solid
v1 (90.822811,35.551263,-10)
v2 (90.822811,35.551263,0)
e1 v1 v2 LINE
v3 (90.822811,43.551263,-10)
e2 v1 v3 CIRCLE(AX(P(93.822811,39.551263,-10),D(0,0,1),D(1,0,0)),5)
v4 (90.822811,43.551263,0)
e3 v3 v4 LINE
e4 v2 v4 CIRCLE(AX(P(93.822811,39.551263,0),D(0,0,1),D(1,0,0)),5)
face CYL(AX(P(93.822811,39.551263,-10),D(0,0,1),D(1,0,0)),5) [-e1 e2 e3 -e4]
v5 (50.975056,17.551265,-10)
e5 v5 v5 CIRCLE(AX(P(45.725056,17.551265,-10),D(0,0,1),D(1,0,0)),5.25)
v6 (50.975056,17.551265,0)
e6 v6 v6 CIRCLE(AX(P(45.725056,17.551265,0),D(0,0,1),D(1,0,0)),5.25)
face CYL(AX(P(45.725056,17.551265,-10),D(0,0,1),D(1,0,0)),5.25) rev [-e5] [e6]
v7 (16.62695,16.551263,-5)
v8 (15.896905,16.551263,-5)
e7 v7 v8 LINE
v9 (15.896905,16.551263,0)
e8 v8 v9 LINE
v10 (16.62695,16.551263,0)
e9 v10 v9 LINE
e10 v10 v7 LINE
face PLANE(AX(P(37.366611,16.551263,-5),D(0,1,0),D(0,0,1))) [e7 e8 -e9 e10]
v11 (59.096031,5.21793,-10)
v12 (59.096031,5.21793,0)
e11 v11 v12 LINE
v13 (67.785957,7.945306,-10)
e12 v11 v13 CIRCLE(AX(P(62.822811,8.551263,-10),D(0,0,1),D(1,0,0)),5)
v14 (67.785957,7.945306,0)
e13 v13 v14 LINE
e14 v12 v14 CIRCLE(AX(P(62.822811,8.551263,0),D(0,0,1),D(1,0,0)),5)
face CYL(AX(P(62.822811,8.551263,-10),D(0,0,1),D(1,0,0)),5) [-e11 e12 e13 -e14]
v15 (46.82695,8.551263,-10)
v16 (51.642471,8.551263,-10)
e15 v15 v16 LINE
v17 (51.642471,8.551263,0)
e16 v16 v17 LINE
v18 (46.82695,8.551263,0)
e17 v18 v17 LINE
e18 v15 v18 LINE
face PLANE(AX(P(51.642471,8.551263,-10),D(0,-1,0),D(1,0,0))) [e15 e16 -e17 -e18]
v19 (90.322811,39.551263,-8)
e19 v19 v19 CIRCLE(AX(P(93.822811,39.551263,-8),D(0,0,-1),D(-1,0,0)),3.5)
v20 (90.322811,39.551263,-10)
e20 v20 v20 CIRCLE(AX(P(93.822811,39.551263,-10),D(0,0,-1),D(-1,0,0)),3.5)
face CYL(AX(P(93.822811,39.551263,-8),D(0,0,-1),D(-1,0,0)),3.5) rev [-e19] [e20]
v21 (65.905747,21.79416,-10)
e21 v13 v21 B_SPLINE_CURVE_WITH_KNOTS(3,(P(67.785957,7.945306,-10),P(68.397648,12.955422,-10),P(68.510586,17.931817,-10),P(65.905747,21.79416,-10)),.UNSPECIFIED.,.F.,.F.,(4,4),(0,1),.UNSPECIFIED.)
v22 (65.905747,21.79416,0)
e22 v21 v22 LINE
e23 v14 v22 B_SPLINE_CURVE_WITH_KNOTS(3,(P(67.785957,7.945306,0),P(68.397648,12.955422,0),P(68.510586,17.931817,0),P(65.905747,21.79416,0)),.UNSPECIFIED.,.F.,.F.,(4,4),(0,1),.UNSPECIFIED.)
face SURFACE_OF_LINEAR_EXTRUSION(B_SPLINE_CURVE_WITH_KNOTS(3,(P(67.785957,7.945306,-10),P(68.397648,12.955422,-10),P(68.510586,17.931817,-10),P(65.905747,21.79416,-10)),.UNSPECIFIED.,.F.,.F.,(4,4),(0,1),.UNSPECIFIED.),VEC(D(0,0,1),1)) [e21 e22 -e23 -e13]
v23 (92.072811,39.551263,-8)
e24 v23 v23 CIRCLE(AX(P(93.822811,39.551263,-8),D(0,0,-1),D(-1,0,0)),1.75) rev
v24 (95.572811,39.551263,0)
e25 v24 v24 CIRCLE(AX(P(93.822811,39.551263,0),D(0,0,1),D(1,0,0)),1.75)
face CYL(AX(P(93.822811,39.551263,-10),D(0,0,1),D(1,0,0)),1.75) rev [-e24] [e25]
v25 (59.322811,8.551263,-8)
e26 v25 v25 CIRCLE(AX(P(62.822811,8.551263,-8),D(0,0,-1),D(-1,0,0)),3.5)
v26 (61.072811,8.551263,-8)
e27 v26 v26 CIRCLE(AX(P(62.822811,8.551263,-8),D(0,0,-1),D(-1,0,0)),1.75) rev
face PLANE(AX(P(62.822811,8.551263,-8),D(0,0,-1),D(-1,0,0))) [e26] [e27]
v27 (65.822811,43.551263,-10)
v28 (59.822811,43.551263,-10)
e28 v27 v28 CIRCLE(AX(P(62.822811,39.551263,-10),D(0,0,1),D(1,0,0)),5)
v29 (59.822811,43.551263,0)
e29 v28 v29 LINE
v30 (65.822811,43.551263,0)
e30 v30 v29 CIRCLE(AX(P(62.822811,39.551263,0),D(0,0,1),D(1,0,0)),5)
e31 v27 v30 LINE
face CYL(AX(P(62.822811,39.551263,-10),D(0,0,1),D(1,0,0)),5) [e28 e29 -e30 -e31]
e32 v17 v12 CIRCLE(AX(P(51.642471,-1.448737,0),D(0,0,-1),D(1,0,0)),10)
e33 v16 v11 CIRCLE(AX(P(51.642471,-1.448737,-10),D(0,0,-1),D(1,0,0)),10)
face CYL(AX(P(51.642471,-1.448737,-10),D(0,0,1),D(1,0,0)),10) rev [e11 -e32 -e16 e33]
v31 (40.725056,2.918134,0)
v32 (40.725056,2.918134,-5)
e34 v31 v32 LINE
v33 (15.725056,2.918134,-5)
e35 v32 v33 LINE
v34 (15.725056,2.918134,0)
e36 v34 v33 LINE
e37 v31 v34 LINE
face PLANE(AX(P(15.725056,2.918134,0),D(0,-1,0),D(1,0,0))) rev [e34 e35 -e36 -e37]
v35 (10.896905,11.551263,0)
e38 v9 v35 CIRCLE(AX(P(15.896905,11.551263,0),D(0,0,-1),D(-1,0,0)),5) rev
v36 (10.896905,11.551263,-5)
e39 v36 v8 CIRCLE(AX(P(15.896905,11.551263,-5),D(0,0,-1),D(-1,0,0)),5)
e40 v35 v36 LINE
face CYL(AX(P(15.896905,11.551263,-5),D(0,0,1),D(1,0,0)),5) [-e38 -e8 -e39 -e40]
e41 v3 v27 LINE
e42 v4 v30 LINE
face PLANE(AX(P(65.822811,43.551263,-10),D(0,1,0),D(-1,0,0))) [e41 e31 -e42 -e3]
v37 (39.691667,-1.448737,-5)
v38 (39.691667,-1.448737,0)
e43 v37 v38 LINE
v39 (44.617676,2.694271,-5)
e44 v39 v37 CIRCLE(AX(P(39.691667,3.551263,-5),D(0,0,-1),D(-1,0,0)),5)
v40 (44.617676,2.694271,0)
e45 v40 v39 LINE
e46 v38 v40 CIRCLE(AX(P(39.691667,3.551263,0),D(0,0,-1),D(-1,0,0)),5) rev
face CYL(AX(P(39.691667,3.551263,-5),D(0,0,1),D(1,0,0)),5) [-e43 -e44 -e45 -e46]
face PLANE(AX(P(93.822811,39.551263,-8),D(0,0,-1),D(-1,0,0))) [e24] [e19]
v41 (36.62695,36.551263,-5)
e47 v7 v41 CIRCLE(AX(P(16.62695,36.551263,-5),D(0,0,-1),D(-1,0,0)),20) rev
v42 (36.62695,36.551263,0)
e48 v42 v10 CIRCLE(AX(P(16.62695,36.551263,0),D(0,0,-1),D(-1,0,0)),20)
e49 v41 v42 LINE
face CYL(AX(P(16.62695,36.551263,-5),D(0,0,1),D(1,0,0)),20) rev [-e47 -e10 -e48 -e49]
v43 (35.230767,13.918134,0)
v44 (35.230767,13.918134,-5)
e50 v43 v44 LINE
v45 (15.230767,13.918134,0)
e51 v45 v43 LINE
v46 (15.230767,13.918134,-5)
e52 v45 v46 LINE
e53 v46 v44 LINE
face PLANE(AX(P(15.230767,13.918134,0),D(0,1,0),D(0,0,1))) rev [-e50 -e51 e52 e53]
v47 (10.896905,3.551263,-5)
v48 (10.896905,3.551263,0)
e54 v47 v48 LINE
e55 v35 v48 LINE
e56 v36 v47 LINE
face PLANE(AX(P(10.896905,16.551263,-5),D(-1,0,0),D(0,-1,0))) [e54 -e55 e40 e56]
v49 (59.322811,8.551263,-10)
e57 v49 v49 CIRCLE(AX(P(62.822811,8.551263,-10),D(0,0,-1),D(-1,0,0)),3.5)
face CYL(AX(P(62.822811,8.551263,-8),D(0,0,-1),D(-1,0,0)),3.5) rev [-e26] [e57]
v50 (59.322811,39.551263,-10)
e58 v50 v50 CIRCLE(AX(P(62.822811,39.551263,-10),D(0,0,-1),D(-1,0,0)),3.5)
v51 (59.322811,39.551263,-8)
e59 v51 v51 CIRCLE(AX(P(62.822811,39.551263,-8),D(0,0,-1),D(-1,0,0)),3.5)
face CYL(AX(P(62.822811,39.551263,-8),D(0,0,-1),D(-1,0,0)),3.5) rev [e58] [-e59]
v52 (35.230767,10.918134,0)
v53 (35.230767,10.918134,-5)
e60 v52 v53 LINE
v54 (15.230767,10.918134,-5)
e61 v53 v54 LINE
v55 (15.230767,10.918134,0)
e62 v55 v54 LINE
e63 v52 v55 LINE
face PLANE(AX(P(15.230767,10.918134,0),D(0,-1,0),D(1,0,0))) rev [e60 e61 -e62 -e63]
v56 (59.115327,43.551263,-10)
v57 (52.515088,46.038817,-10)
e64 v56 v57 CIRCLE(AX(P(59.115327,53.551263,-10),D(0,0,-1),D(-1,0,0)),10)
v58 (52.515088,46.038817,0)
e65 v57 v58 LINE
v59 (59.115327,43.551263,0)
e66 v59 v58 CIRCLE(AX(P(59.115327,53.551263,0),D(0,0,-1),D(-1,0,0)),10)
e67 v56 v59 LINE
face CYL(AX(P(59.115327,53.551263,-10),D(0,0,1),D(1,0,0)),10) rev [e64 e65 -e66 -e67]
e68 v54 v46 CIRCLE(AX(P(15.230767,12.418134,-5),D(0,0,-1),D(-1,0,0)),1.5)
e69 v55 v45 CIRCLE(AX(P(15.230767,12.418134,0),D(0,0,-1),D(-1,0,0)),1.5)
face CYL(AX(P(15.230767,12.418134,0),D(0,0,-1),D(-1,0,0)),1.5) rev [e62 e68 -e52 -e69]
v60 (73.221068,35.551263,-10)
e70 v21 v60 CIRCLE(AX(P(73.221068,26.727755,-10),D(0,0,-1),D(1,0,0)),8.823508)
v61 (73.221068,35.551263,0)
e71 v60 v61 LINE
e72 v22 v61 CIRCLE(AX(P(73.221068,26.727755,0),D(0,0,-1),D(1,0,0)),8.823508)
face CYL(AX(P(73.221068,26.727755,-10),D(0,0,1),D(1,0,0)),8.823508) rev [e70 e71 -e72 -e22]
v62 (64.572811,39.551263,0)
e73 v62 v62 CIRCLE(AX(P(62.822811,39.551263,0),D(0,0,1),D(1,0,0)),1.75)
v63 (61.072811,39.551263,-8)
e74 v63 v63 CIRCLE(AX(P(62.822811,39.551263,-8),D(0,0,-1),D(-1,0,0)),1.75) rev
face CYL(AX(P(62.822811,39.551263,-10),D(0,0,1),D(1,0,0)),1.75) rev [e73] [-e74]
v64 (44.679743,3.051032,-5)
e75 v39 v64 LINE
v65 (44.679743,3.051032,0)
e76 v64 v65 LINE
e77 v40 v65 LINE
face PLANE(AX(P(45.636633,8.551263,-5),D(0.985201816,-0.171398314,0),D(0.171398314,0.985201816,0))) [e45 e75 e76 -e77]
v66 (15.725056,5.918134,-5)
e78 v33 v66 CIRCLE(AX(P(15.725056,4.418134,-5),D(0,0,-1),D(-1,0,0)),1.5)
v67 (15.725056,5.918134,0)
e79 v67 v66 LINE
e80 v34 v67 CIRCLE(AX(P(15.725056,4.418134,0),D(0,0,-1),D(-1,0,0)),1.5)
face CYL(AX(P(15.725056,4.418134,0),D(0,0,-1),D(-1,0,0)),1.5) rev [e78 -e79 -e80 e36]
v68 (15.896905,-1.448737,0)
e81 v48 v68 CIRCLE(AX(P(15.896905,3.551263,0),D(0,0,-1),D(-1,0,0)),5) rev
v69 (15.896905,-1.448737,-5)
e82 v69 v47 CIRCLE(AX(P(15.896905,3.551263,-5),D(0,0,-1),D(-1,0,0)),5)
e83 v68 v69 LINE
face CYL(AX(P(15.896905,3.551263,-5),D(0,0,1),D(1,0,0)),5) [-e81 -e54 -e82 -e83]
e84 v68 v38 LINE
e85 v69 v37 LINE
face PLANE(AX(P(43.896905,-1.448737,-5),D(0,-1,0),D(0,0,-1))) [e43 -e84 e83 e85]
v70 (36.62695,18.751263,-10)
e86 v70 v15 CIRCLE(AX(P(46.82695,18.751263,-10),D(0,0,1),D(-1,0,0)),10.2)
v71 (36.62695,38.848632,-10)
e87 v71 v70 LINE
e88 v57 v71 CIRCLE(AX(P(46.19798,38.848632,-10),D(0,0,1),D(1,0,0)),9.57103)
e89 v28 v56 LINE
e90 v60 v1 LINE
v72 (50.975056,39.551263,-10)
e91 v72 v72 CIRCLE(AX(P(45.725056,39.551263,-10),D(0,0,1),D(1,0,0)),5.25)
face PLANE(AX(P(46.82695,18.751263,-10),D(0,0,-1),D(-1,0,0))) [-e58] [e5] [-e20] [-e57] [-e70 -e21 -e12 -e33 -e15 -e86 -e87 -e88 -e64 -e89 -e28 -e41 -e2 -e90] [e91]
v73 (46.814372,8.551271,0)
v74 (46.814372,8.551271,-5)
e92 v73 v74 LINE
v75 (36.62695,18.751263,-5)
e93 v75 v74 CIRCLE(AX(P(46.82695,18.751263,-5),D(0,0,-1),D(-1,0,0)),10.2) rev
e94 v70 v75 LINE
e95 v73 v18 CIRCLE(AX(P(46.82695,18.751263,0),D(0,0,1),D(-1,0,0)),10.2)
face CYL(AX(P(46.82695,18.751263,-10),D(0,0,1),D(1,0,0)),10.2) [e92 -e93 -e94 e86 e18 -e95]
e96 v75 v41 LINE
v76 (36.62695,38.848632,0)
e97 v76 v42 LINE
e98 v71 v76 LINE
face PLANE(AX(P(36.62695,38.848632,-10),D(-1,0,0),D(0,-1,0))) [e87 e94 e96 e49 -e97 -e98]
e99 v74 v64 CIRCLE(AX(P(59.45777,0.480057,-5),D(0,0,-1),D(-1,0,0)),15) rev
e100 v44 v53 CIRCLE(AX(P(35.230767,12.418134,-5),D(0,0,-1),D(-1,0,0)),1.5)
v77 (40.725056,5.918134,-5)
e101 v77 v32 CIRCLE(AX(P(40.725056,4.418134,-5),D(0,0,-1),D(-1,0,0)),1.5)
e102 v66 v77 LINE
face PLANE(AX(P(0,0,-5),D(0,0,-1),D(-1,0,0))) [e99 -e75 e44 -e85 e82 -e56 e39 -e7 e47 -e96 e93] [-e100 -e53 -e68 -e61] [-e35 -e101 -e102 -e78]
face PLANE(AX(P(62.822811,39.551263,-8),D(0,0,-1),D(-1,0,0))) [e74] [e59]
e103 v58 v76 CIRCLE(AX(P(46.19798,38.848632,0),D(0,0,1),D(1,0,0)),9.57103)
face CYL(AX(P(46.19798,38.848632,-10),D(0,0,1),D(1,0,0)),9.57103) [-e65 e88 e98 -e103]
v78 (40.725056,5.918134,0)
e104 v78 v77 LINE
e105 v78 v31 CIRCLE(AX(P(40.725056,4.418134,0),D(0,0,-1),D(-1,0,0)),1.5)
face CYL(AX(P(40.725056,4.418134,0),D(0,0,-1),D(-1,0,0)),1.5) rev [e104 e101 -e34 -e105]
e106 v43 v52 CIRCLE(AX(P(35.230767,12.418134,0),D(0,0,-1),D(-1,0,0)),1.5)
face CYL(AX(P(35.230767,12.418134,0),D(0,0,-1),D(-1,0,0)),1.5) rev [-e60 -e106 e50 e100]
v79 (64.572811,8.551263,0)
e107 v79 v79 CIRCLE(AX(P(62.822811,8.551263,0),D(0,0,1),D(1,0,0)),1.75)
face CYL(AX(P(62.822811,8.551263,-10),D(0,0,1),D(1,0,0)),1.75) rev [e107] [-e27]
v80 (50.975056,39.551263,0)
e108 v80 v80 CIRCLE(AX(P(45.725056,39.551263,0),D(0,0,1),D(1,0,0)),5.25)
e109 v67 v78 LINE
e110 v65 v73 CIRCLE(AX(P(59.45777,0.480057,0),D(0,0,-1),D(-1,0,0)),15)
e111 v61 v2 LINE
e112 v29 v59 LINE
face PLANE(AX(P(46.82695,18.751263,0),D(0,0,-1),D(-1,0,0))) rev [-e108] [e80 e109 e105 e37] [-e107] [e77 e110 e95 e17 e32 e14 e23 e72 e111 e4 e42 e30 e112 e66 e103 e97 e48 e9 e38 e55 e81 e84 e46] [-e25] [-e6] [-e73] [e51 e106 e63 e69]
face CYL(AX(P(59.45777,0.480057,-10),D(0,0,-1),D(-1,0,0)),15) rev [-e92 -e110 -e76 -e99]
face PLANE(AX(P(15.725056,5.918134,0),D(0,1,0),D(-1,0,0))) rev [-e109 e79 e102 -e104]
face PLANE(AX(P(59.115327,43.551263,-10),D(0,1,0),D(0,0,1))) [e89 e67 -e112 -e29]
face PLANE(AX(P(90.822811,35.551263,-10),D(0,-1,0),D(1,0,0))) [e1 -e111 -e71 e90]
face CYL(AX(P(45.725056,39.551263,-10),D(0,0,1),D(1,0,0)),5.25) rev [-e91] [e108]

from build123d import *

# Parameters (mm, degrees)
SKETCH1_R           = 1.75
SKETCH1_R_2         = 5.25
BOSS_EXTRUDE1_DEPTH = 10
EXTRUDE1_DEPTH      = 5
FILLET2_R           = 20
FILLET3_R           = 5
FILLET5_R           = 5
EXTRUDE2_DEPTH      = 5
FILLET7_R           = 475
FILLET8_R           = 15
FILLET9_R           = 5
SKETCH4_R           = 3.5
EXTRUDE3_DEPTH      = 2


with BuildPart() as part:
    # Sketch1 → Boss-Extrude1 (new body)
    with BuildSketch(Plane.XY):
        with BuildLine():
            Line((59.115327383, 43.551262968), (59.822811009, 43.551262968))
            ThreePointArc((59.822811009, 43.551262968), (62.822811009, 44.551262968), (65.822811009, 43.551262968))
            Line((65.822811009, 43.551262968), (90.822811009, 43.551262968))
            ThreePointArc((90.822811009, 43.551262968), (98.822811009, 39.551262968), (90.822811009, 35.551262968))
            Line((90.822811009, 35.551262968), (73.221068218, 35.551262968))
            ThreePointArc((73.221068218, 35.551262968), (65.430500205, 30.870379763), (65.905746743, 21.794160382))
            add(Edge.make_bspline(
                [(65.905746743, 21.794160382), (68.510586107, 17.931817085), (68.397648351, 12.955422289), (67.785956814, 7.945306105)],
                knots=[0, 0, 0, 0, 1, 1, 1, 1], degree=3))
            ThreePointArc((67.785956814, 7.945306105), (67.117243875, 5.990433735), (65.715264602, 4.47281814))
            ThreePointArc((65.715264602, 4.47281814), (62.263505272, 3.582643734), (59.096031047, 5.217929635))
            ThreePointArc((59.096031047, 5.217929635), (55.724954026, 7.67997226), (51.642471122, 8.551262968))
            Line((51.642471122, 8.551262968), (46.826949913, 8.551262968))
            ThreePointArc((46.826949913, 8.551262968), (39.614460745, 11.5387738), (36.626949913, 18.751262968))
            Line((36.626949913, 18.751262968), (36.626949913, 38.848632096))
            ThreePointArc((36.626949913, 38.848632096), (42.251881835, 47.568318218), (52.515088487, 46.03881686))
            ThreePointArc((52.515088487, 46.03881686), (55.588605185, 44.19379373), (59.115327383, 43.551262968))
        make_face()
        with Locations((93.822811009, 39.551262968)):
            Circle(SKETCH1_R, mode=Mode.SUBTRACT)
        with Locations((62.822811009, 39.551262968)):
            Circle(SKETCH1_R, mode=Mode.SUBTRACT)
        with Locations((62.822811009, 8.551262968)):
            Circle(SKETCH1_R, mode=Mode.SUBTRACT)
        with Locations((45.725055781, 39.551262968)):
            Circle(SKETCH1_R_2, mode=Mode.SUBTRACT)
        with Locations((45.725055781, 17.551264875)):
            Circle(SKETCH1_R_2, mode=Mode.SUBTRACT)
    extrude(amount=-BOSS_EXTRUDE1_DEPTH)

    # Sketch2 → Extrude1 (add)
    with BuildSketch(Plane.XY):
        Polygon((45.636633265, 8.551262968), (43.896905309, -1.448737032), (10.896905309, -1.448737032), (10.896905309, 16.551262968), (37.366610934, 16.551262968), (39.363957543, 12.249932276), (45.636633265, 10.857586925), align=None)
    extrude(amount=-EXTRUDE1_DEPTH)

    # Fillet2
    # the kernel refuses this fillet: 20 mm, written as the material it adds along each edge
    with BuildSketch(Plane(origin=(36.867030235, 16.551262968, -5), x_dir=(-0.0120031513061412, 0.9999279595844501, 0), z_dir=(0, 0, 1))) as fillet2_piece_1:
        with BuildLine():
            CenterArc((20.241503938, 19.998559192), FILLET2_R, 179.312253574, 90)
            Line((0.242944747, 20.238622218), (-1.756911173, 20.26262852))
            Line((-1.756911173, 20.26262852), (-1.999855919, 0.024006303))
            Line((-1.999855919, 0.024006303), (0.407900213, -1.957962568))
            ThreePointArc((0.407900213, -1.957962568), (2.178716929, -1.786199826), (19.97743461, -1.999855919))
            Line((19.97743461, -1.999855919), (20.001440912, 0))
        make_face()
    extrude(amount=5)

    # Fillet3
    fillet3_edges = [part.edges().sort_by_distance(p)[0] for p in [
        (10.896905309, 16.551262968, -2.5),
    ]]
    fillet(fillet3_edges, radius=FILLET3_R)

    # Fillet5
    fillet5_edges = [part.edges().sort_by_distance(p)[0] for p in [
        (10.896905309, -1.448737032, -2.5),
    ]]
    fillet(fillet5_edges, radius=FILLET5_R)

    # Sketch3 → Extrude2 (cut)
    with BuildSketch(Plane(origin=(0, 0, -5), x_dir=(-1, 0, 0), z_dir=(0, 0, -1))):
        with BuildLine():
            Line((-15.230767467, 10.918134064), (-35.230767467, 10.918134064))
            ThreePointArc((-35.230767467, 10.918134064), (-36.730767467, 12.418134064), (-35.230767467, 13.918134064))
            Line((-35.230767467, 13.918134064), (-15.230767467, 13.918134064))
            ThreePointArc((-15.230767467, 13.918134064), (-13.730767467, 12.418134064), (-15.230767467, 10.918134064))
        make_face()
        with BuildLine():
            Line((-15.725055781, 2.918134064), (-40.725055781, 2.918134064))
            ThreePointArc((-40.725055781, 2.918134064), (-42.225055781, 4.418134064), (-40.725055781, 5.918134064))
            Line((-40.725055781, 5.918134064), (-15.725055781, 5.918134064))
            ThreePointArc((-15.725055781, 5.918134064), (-14.225055781, 4.418134064), (-15.725055781, 2.918134064))
        make_face()
    extrude(amount=-EXTRUDE2_DEPTH, mode=Mode.SUBTRACT)

    # Fillet7
    # the kernel refuses this fillet: 475 mm, written as the material it adds along each edge
    with BuildSketch(Plane(origin=(45.636633265, 8.620954667, -5), x_dir=(0, -1, 0), z_dir=(0, 0, 1))) as fillet7_piece_1:
        with BuildLine():
            CenterArc((475.069322793, 0.591997114), FILLET7_R, 179.929346264, 0.142062041)
            ThreePointArc((0.069683944, 1.17773862), (0.051884348, 0.587860954), (0, 0))
            Line((0, 0), (0.069691699, 0))
        make_face()
    extrude(amount=5)

    # Fillet8
    # the kernel refuses this fillet: 15 mm, written as the material it adds along each edge
    with BuildSketch(Plane(origin=(45.636633265, 8.551262968, 0), x_dir=(0.9999999999783198, 6.584854434625016e-06, 0), z_dir=(0, 0, -1))) as fillet8_piece_1:
        with BuildLine():
            CenterArc((13.821083543, 8.071296621), FILLET8_R, 189.869507231, 22.683962159)
            Line((-0.956926764, 5.500224598), (0, 0))
            ThreePointArc((0, 0), (0.58886931, -0.000365018), (1.17773862, 0))
        make_face()
    extrude(amount=5)

    # Fillet9
    fillet9_edges = [part.edges().sort_by_distance(p)[0] for p in [
        (43.896905309, -1.448737032, -2.5),
    ]]
    fillet(fillet9_edges, radius=FILLET9_R)

    # Sketch4 → Extrude3 (cut)
    with BuildSketch(Plane(origin=(0, 0, -10), x_dir=(-1, 0, 0), z_dir=(0, 0, -1))):
        with Locations((-62.822811009, 39.551262968)):
            Circle(SKETCH4_R)
        with Locations((-93.822811009, 39.551262968)):
            Circle(SKETCH4_R)
        with Locations((-62.822811009, 8.551262968)):
            Circle(SKETCH4_R)
    extrude(amount=-EXTRUDE3_DEPTH, mode=Mode.SUBTRACT)


solid = part.part
